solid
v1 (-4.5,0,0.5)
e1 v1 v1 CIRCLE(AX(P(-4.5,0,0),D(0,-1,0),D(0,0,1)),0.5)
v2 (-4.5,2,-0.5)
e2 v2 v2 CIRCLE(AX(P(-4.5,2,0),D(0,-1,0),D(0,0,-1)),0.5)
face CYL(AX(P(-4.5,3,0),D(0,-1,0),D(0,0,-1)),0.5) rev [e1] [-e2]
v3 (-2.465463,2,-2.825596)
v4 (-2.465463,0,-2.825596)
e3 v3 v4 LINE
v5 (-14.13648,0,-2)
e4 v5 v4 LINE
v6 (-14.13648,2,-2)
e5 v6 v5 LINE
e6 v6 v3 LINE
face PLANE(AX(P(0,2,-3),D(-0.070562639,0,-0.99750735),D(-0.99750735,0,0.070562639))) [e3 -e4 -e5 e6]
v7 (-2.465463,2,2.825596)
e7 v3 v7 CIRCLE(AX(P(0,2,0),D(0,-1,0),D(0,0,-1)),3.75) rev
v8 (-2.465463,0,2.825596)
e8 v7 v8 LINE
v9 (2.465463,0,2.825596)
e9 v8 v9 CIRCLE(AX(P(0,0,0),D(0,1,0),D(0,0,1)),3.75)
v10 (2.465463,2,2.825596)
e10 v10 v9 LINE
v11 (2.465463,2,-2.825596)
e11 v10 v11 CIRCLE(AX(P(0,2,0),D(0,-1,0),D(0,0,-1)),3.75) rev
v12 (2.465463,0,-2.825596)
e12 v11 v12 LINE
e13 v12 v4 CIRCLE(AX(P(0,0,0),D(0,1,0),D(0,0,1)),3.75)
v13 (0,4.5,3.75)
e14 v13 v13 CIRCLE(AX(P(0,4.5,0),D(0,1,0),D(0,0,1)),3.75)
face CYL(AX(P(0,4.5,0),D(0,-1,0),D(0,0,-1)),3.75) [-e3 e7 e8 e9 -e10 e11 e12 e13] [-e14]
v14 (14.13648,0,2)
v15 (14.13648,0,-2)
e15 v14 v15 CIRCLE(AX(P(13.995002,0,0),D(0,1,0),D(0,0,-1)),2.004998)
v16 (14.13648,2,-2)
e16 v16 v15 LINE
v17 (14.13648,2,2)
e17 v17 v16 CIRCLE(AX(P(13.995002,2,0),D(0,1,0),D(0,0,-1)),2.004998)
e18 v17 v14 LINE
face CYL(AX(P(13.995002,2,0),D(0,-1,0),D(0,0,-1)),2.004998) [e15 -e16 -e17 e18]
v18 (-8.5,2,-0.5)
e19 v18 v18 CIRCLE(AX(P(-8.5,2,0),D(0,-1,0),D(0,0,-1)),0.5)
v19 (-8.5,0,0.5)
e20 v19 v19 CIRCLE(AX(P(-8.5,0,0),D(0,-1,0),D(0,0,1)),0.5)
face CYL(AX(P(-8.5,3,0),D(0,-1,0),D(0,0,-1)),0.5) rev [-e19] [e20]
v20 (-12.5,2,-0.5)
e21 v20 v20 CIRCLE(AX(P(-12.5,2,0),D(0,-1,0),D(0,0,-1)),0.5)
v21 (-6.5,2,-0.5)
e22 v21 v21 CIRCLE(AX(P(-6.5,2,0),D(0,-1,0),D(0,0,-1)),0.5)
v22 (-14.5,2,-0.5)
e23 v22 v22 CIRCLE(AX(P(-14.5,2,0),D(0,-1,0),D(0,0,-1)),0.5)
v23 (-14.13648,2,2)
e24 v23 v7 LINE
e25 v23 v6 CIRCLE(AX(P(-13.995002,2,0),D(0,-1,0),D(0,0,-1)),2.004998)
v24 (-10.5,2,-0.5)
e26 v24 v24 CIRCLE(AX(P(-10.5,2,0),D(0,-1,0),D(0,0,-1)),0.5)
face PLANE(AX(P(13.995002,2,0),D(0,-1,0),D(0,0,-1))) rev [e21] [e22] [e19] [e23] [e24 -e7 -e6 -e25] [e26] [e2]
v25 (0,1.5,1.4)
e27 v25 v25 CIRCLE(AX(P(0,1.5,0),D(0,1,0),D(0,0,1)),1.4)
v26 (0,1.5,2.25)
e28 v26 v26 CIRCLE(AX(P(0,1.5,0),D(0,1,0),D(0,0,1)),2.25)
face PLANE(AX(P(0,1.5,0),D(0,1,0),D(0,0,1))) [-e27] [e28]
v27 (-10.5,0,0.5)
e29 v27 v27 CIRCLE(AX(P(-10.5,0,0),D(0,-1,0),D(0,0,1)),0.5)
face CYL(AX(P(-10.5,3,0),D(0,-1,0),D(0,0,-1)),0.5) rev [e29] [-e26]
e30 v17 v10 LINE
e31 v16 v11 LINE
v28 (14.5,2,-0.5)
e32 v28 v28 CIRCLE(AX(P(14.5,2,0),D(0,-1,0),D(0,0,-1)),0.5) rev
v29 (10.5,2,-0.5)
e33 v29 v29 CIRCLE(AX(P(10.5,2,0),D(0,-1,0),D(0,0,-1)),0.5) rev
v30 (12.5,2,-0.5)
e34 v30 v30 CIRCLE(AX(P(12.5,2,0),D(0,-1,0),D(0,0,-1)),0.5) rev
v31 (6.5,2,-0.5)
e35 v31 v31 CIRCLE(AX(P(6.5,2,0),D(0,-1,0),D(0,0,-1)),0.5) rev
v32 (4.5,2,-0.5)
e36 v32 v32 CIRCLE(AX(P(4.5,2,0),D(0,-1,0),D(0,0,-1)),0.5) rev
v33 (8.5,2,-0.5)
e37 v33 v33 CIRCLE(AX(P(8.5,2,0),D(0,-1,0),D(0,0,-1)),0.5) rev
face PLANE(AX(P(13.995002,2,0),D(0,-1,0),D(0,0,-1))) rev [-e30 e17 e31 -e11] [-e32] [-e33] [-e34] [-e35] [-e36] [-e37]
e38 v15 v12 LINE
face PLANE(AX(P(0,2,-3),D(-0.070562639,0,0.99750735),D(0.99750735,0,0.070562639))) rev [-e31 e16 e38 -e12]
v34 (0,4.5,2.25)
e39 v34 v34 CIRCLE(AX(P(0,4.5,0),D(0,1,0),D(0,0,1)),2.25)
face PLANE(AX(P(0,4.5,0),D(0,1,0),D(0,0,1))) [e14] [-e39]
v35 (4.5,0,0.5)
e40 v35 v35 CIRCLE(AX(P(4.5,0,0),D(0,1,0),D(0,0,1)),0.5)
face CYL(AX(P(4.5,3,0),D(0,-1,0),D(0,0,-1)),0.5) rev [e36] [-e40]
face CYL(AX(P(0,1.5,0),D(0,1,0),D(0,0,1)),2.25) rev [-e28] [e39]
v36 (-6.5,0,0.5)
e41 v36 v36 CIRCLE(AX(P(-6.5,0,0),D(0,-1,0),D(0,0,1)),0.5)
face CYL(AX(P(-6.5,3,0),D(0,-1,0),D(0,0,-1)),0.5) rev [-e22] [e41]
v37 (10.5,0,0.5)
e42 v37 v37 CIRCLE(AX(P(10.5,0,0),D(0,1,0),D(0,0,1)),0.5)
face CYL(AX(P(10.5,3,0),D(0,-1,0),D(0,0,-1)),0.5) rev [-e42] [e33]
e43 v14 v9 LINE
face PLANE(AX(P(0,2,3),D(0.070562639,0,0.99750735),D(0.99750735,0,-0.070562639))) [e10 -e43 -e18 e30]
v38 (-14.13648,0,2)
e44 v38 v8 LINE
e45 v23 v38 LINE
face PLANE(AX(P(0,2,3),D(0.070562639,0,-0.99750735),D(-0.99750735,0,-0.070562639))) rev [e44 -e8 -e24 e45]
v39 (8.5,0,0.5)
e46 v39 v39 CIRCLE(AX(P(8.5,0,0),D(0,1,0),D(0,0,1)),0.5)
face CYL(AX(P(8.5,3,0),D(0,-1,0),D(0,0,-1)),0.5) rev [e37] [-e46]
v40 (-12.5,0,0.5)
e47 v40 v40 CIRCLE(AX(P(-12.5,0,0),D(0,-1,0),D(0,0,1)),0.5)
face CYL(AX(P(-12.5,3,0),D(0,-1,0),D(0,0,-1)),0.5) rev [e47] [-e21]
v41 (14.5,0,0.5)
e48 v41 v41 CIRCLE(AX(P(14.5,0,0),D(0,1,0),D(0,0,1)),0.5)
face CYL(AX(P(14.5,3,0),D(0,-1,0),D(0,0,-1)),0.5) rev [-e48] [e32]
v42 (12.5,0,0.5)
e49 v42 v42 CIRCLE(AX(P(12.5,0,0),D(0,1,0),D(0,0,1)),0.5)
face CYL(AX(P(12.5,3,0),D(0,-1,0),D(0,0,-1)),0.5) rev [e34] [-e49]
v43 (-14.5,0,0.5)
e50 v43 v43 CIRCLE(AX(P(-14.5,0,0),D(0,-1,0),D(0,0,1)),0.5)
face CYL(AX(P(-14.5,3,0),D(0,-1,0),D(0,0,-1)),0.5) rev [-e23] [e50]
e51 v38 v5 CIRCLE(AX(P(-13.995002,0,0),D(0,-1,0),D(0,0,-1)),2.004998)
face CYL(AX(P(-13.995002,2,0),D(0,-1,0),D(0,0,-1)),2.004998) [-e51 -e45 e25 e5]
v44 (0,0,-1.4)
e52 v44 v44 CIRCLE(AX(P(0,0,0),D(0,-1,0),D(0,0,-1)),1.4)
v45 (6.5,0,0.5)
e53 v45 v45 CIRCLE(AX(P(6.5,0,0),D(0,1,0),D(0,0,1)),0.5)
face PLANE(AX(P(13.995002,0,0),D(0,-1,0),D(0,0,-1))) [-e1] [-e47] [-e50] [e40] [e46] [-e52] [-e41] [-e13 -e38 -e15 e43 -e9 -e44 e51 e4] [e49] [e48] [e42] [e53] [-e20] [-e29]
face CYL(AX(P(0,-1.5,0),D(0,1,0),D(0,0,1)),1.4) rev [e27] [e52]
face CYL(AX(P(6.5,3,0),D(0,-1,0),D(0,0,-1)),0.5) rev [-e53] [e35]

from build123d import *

# Parameters (mm, degrees)
BOSS_EXTRUDE1_DEPTH = 2
SKETCH5_R           = 0.5
CUT_EXTRUDE5_DEPTH  = 3
LPATTERN1_COUNT     = 6
LPATTERN1_PITCH     = 2
MIRROR2_OUTLINE_R   = 0.5
MIRROR2_DEPTH       = 2
SKETCH2_R           = 3.75
BOSS_EXTRUDE2_DEPTH = 4.5
SKETCH3_R           = 2.25
CUT_EXTRUDE1_DEPTH  = 3
SKETCH4_R           = 1.4
CUT_EXTRUDE2_DEPTH  = 3


# Read off the part's stored shape, not the designer's step: Mirror2
with BuildPart() as part:
    # Sketch1 → Boss-Extrude1 (new body)
    with BuildSketch(Plane(origin=(0, 0, 0), x_dir=(1, 0, 0), z_dir=(0, 1, 0))):
        with BuildLine():
            Line((0, 3), (14.136480176, 2))
            ThreePointArc((14.136480176, 2), (15.461917194, 1.366812545), (16, 0))
            Line((16, 0), (0, 0))
            Line((0, 0), (0, 3))
        make_face()
    boss_extrude1 = extrude(amount=BOSS_EXTRUDE1_DEPTH)

    # Mirror1: Boss-Extrude1 across plane
    add(boss_extrude1.mirror(Plane.XY))

    # Sketch5 → Cut-Extrude5 (cut)
    with BuildSketch(Plane(origin=(0, 0, 0), x_dir=(1, 0, 0), z_dir=(0, 1, 0))):
        with Locations(Location((4.5, 0, 0), (0, 0, 90))):
            Circle(SKETCH5_R)
    cut_extrude5 = extrude(amount=CUT_EXTRUDE5_DEPTH, mode=Mode.SUBTRACT)

    # LPattern1: Cut-Extrude5 ×6
    with Locations(*[(i * LPATTERN1_PITCH, 0, 0) for i in range(1, LPATTERN1_COUNT)]):
        add(cut_extrude5, mode=Mode.SUBTRACT)

    # Mirror2 outline → Mirror2 (add)
    with BuildSketch(Plane(origin=(0, 0, 0), x_dir=(1, 0, 0), z_dir=(0, 1, 0))):
        with BuildLine():
            Line((0, -3), (0, 3))
            Line((0, 3), (-14.136480176, 2))
            ThreePointArc((-14.136480176, 2), (-16, 0), (-14.136480176, -2))
            Line((-14.136480176, -2), (0, -3))
        make_face()
        with Locations((-14.5, 0)):
            Circle(MIRROR2_OUTLINE_R, mode=Mode.SUBTRACT)
        with Locations((-12.5, 0)):
            Circle(MIRROR2_OUTLINE_R, mode=Mode.SUBTRACT)
        with Locations((-10.5, 0)):
            Circle(MIRROR2_OUTLINE_R, mode=Mode.SUBTRACT)
        with Locations((-8.5, 0)):
            Circle(MIRROR2_OUTLINE_R, mode=Mode.SUBTRACT)
        with Locations((-6.5, 0)):
            Circle(MIRROR2_OUTLINE_R, mode=Mode.SUBTRACT)
        with Locations((-4.5, 0)):
            Circle(MIRROR2_OUTLINE_R, mode=Mode.SUBTRACT)
    extrude(amount=MIRROR2_DEPTH)

    # Sketch2 → Boss-Extrude2 (add)
    with BuildSketch(Plane(origin=(0, 0, 0), x_dir=(1, 0, 0), z_dir=(0, 1, 0))):
        with Locations(Location((0, 0, 0), (0, 0, 48.893793678))):
            Circle(SKETCH2_R)
    extrude(amount=BOSS_EXTRUDE2_DEPTH)

    # Sketch3 → Cut-Extrude1 (cut)
    with BuildSketch(Plane(origin=(0, 4.5, 0), x_dir=(1, 0, 0), z_dir=(0, 1, 0))):
        with Locations(Location((0, 0, 0), (0, 0, 270))):
            Circle(SKETCH3_R)
    extrude(amount=-CUT_EXTRUDE1_DEPTH, mode=Mode.SUBTRACT)

    # Sketch4 → Cut-Extrude2 (cut)
    with BuildSketch(Plane(origin=(0, 1.5, 0), x_dir=(1, 0, 0), z_dir=(0, 1, 0))):
        with Locations(Location((0, 0, 0), (0, 0, 270))):
            Circle(SKETCH4_R)
    extrude(amount=-CUT_EXTRUDE2_DEPTH, mode=Mode.SUBTRACT)


solid = part.part
